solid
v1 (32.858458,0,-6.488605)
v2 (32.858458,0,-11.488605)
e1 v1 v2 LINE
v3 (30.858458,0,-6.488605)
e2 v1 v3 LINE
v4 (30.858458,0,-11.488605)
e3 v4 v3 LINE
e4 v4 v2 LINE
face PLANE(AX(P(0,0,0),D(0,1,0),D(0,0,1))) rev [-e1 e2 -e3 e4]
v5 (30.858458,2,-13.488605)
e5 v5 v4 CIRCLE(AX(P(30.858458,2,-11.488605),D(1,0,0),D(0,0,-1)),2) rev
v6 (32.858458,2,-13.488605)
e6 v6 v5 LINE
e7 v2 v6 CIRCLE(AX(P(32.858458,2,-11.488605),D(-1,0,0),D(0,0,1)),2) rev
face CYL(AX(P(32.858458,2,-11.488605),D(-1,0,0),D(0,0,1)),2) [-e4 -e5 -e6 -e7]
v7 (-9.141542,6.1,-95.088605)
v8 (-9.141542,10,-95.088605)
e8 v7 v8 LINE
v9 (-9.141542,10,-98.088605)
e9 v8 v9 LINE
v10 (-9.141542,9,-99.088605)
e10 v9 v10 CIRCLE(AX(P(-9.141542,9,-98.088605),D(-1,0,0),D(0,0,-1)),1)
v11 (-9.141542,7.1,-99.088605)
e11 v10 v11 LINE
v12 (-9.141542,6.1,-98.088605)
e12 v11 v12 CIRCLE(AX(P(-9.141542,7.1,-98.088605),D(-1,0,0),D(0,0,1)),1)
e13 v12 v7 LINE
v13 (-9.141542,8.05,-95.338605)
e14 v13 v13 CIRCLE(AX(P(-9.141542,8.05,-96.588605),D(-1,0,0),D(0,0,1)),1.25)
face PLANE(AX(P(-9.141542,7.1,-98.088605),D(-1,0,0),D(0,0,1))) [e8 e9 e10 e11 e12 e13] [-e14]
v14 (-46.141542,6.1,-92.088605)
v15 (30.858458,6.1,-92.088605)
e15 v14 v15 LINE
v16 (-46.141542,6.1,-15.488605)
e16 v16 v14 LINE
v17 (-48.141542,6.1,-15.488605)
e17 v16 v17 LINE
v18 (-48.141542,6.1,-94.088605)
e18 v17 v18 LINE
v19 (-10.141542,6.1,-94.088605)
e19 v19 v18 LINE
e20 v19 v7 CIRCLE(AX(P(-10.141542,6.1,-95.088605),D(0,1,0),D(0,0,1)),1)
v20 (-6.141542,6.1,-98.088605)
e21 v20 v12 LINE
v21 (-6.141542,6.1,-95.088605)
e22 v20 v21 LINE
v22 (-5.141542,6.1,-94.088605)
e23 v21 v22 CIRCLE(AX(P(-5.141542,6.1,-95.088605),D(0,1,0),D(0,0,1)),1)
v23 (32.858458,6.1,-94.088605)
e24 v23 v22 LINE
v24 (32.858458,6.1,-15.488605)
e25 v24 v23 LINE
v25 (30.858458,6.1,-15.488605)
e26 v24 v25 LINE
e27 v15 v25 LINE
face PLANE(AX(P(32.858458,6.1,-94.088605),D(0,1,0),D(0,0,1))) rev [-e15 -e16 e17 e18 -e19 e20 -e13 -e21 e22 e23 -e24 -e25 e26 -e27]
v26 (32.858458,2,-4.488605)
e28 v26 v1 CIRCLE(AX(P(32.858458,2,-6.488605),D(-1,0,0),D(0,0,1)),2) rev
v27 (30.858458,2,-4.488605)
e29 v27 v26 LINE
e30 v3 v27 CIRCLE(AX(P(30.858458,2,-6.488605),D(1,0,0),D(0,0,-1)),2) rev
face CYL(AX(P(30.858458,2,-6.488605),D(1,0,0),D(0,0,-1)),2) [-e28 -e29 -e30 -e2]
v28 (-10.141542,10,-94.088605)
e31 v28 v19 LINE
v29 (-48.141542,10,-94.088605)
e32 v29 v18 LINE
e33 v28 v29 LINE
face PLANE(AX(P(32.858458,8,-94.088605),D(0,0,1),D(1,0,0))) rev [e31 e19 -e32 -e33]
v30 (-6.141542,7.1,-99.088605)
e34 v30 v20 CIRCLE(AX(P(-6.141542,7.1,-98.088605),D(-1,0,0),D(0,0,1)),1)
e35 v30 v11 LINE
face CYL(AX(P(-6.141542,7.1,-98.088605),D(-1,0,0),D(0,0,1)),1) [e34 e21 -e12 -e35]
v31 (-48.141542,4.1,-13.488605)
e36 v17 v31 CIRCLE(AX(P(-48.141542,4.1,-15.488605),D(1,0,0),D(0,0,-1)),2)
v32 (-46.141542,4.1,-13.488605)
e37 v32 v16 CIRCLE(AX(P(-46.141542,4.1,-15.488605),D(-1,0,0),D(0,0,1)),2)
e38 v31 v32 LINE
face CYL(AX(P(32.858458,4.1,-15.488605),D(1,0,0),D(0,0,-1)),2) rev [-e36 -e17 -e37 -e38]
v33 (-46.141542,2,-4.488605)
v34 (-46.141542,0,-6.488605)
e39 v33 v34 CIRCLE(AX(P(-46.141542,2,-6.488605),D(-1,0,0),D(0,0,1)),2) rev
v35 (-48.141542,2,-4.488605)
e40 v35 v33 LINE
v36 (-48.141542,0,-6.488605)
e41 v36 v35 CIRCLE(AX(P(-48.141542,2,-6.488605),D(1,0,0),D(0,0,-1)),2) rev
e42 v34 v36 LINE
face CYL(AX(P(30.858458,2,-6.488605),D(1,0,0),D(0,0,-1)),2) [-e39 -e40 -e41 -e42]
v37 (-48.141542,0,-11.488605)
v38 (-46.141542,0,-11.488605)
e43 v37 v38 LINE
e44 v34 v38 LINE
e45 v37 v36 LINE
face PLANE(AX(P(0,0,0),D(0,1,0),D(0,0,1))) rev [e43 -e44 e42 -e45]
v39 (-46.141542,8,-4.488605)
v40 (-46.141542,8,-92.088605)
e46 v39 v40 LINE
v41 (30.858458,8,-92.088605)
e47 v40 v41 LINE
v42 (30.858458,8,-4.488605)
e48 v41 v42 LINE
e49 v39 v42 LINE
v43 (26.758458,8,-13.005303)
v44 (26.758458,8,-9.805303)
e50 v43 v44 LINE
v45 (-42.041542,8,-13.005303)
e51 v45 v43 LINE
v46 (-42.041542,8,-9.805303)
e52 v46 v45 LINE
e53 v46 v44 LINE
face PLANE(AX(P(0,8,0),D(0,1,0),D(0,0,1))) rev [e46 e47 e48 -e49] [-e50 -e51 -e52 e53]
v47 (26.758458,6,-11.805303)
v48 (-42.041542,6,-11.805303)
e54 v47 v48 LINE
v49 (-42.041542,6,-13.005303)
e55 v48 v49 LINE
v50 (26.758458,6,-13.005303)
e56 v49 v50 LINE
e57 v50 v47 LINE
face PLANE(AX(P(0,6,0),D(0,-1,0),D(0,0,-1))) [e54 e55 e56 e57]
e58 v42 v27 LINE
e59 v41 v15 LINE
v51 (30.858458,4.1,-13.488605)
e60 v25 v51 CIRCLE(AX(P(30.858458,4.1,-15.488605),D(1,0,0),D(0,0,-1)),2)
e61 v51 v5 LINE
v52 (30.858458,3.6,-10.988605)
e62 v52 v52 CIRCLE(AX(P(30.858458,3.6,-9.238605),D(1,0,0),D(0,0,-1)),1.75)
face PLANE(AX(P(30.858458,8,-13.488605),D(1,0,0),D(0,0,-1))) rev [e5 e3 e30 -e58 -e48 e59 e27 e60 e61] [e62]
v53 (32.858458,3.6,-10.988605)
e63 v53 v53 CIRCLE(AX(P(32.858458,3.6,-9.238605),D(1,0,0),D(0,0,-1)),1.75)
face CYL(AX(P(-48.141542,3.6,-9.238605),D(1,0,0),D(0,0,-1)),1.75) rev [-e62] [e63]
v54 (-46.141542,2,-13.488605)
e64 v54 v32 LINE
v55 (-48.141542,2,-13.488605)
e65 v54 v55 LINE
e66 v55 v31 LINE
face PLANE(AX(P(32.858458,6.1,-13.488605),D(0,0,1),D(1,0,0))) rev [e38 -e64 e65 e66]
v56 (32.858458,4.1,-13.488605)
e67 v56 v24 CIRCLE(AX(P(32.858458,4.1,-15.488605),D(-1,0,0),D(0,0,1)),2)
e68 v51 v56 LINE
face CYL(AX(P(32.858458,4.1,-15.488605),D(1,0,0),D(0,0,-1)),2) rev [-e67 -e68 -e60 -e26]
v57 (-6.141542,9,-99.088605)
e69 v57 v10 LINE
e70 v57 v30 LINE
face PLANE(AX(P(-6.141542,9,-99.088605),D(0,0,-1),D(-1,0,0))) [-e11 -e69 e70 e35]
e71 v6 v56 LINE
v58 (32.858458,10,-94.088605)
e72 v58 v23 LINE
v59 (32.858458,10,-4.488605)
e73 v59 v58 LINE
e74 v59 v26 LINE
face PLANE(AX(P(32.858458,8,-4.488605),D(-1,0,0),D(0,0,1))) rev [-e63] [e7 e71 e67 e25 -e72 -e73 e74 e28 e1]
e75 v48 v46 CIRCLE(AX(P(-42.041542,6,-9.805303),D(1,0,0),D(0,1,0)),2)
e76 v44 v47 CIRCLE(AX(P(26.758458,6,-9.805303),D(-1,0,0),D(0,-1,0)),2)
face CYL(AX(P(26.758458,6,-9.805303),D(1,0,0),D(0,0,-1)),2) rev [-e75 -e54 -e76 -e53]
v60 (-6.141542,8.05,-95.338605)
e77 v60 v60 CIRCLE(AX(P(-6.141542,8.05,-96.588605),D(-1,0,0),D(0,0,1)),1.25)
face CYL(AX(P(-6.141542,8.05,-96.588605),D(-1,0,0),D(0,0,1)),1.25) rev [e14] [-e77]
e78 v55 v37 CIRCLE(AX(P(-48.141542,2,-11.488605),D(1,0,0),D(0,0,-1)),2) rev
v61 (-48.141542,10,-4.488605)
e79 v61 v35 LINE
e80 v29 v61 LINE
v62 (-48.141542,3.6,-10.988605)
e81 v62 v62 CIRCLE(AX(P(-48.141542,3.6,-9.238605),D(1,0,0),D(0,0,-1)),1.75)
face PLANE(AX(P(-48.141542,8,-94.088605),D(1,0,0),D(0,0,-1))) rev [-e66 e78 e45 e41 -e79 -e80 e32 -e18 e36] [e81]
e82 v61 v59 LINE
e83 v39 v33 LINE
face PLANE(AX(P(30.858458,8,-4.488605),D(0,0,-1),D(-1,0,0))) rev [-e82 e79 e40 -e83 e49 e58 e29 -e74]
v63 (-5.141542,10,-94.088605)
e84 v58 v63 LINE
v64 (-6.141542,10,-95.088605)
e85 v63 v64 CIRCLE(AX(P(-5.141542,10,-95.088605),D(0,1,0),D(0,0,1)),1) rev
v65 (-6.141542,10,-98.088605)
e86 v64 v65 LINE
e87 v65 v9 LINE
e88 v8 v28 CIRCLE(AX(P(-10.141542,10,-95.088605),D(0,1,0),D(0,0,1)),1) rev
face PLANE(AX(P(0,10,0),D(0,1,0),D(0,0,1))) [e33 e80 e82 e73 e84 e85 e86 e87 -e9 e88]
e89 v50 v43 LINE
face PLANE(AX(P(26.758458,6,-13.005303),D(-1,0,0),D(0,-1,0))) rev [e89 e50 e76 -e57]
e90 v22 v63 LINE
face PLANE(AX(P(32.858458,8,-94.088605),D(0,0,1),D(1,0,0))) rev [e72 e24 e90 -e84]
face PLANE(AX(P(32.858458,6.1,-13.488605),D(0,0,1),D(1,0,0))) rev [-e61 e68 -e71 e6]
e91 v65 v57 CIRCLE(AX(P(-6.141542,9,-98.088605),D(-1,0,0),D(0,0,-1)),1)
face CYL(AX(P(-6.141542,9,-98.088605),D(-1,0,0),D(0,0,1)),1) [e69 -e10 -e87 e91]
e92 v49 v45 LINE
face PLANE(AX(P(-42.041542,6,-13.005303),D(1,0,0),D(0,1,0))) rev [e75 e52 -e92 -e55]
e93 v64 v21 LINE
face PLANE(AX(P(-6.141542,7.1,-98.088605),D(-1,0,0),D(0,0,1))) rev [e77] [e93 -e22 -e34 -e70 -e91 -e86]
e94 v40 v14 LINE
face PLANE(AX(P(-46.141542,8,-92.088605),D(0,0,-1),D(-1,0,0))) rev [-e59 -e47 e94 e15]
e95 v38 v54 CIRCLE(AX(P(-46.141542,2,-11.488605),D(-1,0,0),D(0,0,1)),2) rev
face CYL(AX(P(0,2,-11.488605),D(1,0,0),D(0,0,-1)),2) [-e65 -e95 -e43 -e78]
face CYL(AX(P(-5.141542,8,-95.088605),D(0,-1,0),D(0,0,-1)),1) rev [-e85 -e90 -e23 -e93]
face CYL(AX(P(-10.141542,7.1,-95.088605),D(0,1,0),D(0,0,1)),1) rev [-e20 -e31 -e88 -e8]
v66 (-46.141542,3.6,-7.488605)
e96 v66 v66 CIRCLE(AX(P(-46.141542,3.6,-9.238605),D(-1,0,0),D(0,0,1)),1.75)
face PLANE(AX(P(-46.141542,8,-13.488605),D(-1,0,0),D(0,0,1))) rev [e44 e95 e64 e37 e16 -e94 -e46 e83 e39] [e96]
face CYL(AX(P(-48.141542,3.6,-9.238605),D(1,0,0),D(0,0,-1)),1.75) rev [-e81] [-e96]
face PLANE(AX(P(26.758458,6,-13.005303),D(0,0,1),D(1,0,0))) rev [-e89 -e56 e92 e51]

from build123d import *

# Parameters (mm, degrees)
BOSS_EXTRUDE2_DEPTH      = 8
SKETCH2_W                = 81
SKETCH2_H                = 89.6
BOSS_EXTRUDE3_DEPTH      = 2
SKETCH3_R                = 1.75
CUT_EXTRUDE1_DEPTH       = 125.5538661
CUT_EXTRUDE2_DEPTH       = 124.262587838
CUT_EXTRUDE2_DEPTH_BACK  = 124.262587838
SKETCH4_W                = 80.6
SKETCH4_H                = 6.1
SKETCH5_W                = 68.8
SKETCH5_H                = 1.2
BOSS_EXTRUDE4_DEPTH      = 2
FILLET2_R                = 2
BOSS_EXTRUDE5_DEPTH      = 1.5
BOSS_EXTRUDE5_DEPTH_BACK = 1.5
SKETCH7_R                = 1.25
FILLET5_R                = 1


with BuildPart() as part:
    # Sketch1 → Boss-Extrude2 (new body)
    with BuildSketch(Plane(origin=(0, 0, 0), x_dir=(1, 0, 0), z_dir=(0, 1, 0))):
        Polygon((-46.14154214, 4.488604838), (-46.14154214, 13.488604838), (-46.14154214, 92.088604838), (30.85845786, 92.088604838), (30.85845786, 13.488604838), (30.85845786, 4.488604838), (32.85845786, 4.488604838), (32.85845786, 94.088604838), (-48.14154214, 94.088604838), (-48.14154214, 4.488604838), align=None)
    extrude(amount=BOSS_EXTRUDE2_DEPTH)

    # Sketch2 → Boss-Extrude3 (add)
    with BuildSketch(Plane(origin=(0, 8, 0), x_dir=(1, 0, 0), z_dir=(0, 1, 0))):
        with Locations((-7.64154214, 49.288604838)):
            Rectangle(SKETCH2_W, SKETCH2_H)
    extrude(amount=BOSS_EXTRUDE3_DEPTH)

    # Sketch3 → Cut-Extrude1 (cut, through all)
    with BuildSketch(Plane(origin=(32.85845786, 0, 0), x_dir=(0, 0, -1), z_dir=(1, 0, 0))):
        with Locations((9.238604838, 3.6)):
            Circle(SKETCH3_R)
    extrude(amount=-CUT_EXTRUDE1_DEPTH, mode=Mode.SUBTRACT)

    # Sketch4 → Cut-Extrude2 (cut, two sides: drawn at the far end of the back side and taken through both)
    with BuildSketch(Plane.ZY.offset(-30.85845786).offset(-CUT_EXTRUDE2_DEPTH_BACK)):
        with Locations((-53.788604838, 3.05)):
            Rectangle(SKETCH4_W, SKETCH4_H)
    extrude(amount=CUT_EXTRUDE2_DEPTH + CUT_EXTRUDE2_DEPTH_BACK, mode=Mode.SUBTRACT)

    # Sketch5 → Boss-Extrude4 (add)
    with BuildSketch(Plane.XZ.offset(-8)):
        with Locations((-7.64154214, -12.405302831)):
            Rectangle(SKETCH5_W, SKETCH5_H)
    extrude(amount=BOSS_EXTRUDE4_DEPTH)

    # Fillet2
    fillet2_edges = [part.edges().sort_by_distance(p)[0] for p in [
        (-7.64154214, 8, -11.805302831),
        (-47.14154214, 0, -4.488604838),
        (-47.14154214, 0, -13.488604838),
        (-47.14154214, 6.1, -13.488604838),
        (31.85845786, 6.1, -13.488604838),
        (31.85845786, 0, -4.488604838),
        (31.85845786, 0, -13.488604838),
    ]]
    fillet(fillet2_edges, radius=FILLET2_R - 0.0001)  # a hair under: the kernel refuses the full size

    # Sketch7 → Boss-Extrude5 (add, two sides: drawn at the far end of the back side and taken through both)
    with BuildSketch(Plane.ZY.offset(7.64154214).offset(-BOSS_EXTRUDE5_DEPTH_BACK)):
        with BuildLine():
            Line((-94.088604838, 10), (-98.088604838, 10))
            ThreePointArc((-98.088604838, 10), (-98.79571162, 9.707106781), (-99.088604838, 9))
            Line((-99.088604838, 9), (-99.088604838, 7.1))
            ThreePointArc((-99.088604838, 7.1), (-98.79571162, 6.392893219), (-98.088604838, 6.1))
            Line((-98.088604838, 6.1), (-94.088604838, 6.1))
            Line((-94.088604838, 6.1), (-94.088604838, 10))
        make_face()
        with Locations((-96.588604838, 8.05)):
            Circle(SKETCH7_R, mode=Mode.SUBTRACT)
    extrude(amount=BOSS_EXTRUDE5_DEPTH + BOSS_EXTRUDE5_DEPTH_BACK)

    # Fillet5
    fillet5_edges = [part.edges().sort_by_distance(p)[0] for p in [
        (-6.14154214, 8.05, -94.088604838),
        (-9.14154214, 8.05, -94.088604838),
    ]]
    fillet(fillet5_edges, radius=FILLET5_R)


solid = part.part
